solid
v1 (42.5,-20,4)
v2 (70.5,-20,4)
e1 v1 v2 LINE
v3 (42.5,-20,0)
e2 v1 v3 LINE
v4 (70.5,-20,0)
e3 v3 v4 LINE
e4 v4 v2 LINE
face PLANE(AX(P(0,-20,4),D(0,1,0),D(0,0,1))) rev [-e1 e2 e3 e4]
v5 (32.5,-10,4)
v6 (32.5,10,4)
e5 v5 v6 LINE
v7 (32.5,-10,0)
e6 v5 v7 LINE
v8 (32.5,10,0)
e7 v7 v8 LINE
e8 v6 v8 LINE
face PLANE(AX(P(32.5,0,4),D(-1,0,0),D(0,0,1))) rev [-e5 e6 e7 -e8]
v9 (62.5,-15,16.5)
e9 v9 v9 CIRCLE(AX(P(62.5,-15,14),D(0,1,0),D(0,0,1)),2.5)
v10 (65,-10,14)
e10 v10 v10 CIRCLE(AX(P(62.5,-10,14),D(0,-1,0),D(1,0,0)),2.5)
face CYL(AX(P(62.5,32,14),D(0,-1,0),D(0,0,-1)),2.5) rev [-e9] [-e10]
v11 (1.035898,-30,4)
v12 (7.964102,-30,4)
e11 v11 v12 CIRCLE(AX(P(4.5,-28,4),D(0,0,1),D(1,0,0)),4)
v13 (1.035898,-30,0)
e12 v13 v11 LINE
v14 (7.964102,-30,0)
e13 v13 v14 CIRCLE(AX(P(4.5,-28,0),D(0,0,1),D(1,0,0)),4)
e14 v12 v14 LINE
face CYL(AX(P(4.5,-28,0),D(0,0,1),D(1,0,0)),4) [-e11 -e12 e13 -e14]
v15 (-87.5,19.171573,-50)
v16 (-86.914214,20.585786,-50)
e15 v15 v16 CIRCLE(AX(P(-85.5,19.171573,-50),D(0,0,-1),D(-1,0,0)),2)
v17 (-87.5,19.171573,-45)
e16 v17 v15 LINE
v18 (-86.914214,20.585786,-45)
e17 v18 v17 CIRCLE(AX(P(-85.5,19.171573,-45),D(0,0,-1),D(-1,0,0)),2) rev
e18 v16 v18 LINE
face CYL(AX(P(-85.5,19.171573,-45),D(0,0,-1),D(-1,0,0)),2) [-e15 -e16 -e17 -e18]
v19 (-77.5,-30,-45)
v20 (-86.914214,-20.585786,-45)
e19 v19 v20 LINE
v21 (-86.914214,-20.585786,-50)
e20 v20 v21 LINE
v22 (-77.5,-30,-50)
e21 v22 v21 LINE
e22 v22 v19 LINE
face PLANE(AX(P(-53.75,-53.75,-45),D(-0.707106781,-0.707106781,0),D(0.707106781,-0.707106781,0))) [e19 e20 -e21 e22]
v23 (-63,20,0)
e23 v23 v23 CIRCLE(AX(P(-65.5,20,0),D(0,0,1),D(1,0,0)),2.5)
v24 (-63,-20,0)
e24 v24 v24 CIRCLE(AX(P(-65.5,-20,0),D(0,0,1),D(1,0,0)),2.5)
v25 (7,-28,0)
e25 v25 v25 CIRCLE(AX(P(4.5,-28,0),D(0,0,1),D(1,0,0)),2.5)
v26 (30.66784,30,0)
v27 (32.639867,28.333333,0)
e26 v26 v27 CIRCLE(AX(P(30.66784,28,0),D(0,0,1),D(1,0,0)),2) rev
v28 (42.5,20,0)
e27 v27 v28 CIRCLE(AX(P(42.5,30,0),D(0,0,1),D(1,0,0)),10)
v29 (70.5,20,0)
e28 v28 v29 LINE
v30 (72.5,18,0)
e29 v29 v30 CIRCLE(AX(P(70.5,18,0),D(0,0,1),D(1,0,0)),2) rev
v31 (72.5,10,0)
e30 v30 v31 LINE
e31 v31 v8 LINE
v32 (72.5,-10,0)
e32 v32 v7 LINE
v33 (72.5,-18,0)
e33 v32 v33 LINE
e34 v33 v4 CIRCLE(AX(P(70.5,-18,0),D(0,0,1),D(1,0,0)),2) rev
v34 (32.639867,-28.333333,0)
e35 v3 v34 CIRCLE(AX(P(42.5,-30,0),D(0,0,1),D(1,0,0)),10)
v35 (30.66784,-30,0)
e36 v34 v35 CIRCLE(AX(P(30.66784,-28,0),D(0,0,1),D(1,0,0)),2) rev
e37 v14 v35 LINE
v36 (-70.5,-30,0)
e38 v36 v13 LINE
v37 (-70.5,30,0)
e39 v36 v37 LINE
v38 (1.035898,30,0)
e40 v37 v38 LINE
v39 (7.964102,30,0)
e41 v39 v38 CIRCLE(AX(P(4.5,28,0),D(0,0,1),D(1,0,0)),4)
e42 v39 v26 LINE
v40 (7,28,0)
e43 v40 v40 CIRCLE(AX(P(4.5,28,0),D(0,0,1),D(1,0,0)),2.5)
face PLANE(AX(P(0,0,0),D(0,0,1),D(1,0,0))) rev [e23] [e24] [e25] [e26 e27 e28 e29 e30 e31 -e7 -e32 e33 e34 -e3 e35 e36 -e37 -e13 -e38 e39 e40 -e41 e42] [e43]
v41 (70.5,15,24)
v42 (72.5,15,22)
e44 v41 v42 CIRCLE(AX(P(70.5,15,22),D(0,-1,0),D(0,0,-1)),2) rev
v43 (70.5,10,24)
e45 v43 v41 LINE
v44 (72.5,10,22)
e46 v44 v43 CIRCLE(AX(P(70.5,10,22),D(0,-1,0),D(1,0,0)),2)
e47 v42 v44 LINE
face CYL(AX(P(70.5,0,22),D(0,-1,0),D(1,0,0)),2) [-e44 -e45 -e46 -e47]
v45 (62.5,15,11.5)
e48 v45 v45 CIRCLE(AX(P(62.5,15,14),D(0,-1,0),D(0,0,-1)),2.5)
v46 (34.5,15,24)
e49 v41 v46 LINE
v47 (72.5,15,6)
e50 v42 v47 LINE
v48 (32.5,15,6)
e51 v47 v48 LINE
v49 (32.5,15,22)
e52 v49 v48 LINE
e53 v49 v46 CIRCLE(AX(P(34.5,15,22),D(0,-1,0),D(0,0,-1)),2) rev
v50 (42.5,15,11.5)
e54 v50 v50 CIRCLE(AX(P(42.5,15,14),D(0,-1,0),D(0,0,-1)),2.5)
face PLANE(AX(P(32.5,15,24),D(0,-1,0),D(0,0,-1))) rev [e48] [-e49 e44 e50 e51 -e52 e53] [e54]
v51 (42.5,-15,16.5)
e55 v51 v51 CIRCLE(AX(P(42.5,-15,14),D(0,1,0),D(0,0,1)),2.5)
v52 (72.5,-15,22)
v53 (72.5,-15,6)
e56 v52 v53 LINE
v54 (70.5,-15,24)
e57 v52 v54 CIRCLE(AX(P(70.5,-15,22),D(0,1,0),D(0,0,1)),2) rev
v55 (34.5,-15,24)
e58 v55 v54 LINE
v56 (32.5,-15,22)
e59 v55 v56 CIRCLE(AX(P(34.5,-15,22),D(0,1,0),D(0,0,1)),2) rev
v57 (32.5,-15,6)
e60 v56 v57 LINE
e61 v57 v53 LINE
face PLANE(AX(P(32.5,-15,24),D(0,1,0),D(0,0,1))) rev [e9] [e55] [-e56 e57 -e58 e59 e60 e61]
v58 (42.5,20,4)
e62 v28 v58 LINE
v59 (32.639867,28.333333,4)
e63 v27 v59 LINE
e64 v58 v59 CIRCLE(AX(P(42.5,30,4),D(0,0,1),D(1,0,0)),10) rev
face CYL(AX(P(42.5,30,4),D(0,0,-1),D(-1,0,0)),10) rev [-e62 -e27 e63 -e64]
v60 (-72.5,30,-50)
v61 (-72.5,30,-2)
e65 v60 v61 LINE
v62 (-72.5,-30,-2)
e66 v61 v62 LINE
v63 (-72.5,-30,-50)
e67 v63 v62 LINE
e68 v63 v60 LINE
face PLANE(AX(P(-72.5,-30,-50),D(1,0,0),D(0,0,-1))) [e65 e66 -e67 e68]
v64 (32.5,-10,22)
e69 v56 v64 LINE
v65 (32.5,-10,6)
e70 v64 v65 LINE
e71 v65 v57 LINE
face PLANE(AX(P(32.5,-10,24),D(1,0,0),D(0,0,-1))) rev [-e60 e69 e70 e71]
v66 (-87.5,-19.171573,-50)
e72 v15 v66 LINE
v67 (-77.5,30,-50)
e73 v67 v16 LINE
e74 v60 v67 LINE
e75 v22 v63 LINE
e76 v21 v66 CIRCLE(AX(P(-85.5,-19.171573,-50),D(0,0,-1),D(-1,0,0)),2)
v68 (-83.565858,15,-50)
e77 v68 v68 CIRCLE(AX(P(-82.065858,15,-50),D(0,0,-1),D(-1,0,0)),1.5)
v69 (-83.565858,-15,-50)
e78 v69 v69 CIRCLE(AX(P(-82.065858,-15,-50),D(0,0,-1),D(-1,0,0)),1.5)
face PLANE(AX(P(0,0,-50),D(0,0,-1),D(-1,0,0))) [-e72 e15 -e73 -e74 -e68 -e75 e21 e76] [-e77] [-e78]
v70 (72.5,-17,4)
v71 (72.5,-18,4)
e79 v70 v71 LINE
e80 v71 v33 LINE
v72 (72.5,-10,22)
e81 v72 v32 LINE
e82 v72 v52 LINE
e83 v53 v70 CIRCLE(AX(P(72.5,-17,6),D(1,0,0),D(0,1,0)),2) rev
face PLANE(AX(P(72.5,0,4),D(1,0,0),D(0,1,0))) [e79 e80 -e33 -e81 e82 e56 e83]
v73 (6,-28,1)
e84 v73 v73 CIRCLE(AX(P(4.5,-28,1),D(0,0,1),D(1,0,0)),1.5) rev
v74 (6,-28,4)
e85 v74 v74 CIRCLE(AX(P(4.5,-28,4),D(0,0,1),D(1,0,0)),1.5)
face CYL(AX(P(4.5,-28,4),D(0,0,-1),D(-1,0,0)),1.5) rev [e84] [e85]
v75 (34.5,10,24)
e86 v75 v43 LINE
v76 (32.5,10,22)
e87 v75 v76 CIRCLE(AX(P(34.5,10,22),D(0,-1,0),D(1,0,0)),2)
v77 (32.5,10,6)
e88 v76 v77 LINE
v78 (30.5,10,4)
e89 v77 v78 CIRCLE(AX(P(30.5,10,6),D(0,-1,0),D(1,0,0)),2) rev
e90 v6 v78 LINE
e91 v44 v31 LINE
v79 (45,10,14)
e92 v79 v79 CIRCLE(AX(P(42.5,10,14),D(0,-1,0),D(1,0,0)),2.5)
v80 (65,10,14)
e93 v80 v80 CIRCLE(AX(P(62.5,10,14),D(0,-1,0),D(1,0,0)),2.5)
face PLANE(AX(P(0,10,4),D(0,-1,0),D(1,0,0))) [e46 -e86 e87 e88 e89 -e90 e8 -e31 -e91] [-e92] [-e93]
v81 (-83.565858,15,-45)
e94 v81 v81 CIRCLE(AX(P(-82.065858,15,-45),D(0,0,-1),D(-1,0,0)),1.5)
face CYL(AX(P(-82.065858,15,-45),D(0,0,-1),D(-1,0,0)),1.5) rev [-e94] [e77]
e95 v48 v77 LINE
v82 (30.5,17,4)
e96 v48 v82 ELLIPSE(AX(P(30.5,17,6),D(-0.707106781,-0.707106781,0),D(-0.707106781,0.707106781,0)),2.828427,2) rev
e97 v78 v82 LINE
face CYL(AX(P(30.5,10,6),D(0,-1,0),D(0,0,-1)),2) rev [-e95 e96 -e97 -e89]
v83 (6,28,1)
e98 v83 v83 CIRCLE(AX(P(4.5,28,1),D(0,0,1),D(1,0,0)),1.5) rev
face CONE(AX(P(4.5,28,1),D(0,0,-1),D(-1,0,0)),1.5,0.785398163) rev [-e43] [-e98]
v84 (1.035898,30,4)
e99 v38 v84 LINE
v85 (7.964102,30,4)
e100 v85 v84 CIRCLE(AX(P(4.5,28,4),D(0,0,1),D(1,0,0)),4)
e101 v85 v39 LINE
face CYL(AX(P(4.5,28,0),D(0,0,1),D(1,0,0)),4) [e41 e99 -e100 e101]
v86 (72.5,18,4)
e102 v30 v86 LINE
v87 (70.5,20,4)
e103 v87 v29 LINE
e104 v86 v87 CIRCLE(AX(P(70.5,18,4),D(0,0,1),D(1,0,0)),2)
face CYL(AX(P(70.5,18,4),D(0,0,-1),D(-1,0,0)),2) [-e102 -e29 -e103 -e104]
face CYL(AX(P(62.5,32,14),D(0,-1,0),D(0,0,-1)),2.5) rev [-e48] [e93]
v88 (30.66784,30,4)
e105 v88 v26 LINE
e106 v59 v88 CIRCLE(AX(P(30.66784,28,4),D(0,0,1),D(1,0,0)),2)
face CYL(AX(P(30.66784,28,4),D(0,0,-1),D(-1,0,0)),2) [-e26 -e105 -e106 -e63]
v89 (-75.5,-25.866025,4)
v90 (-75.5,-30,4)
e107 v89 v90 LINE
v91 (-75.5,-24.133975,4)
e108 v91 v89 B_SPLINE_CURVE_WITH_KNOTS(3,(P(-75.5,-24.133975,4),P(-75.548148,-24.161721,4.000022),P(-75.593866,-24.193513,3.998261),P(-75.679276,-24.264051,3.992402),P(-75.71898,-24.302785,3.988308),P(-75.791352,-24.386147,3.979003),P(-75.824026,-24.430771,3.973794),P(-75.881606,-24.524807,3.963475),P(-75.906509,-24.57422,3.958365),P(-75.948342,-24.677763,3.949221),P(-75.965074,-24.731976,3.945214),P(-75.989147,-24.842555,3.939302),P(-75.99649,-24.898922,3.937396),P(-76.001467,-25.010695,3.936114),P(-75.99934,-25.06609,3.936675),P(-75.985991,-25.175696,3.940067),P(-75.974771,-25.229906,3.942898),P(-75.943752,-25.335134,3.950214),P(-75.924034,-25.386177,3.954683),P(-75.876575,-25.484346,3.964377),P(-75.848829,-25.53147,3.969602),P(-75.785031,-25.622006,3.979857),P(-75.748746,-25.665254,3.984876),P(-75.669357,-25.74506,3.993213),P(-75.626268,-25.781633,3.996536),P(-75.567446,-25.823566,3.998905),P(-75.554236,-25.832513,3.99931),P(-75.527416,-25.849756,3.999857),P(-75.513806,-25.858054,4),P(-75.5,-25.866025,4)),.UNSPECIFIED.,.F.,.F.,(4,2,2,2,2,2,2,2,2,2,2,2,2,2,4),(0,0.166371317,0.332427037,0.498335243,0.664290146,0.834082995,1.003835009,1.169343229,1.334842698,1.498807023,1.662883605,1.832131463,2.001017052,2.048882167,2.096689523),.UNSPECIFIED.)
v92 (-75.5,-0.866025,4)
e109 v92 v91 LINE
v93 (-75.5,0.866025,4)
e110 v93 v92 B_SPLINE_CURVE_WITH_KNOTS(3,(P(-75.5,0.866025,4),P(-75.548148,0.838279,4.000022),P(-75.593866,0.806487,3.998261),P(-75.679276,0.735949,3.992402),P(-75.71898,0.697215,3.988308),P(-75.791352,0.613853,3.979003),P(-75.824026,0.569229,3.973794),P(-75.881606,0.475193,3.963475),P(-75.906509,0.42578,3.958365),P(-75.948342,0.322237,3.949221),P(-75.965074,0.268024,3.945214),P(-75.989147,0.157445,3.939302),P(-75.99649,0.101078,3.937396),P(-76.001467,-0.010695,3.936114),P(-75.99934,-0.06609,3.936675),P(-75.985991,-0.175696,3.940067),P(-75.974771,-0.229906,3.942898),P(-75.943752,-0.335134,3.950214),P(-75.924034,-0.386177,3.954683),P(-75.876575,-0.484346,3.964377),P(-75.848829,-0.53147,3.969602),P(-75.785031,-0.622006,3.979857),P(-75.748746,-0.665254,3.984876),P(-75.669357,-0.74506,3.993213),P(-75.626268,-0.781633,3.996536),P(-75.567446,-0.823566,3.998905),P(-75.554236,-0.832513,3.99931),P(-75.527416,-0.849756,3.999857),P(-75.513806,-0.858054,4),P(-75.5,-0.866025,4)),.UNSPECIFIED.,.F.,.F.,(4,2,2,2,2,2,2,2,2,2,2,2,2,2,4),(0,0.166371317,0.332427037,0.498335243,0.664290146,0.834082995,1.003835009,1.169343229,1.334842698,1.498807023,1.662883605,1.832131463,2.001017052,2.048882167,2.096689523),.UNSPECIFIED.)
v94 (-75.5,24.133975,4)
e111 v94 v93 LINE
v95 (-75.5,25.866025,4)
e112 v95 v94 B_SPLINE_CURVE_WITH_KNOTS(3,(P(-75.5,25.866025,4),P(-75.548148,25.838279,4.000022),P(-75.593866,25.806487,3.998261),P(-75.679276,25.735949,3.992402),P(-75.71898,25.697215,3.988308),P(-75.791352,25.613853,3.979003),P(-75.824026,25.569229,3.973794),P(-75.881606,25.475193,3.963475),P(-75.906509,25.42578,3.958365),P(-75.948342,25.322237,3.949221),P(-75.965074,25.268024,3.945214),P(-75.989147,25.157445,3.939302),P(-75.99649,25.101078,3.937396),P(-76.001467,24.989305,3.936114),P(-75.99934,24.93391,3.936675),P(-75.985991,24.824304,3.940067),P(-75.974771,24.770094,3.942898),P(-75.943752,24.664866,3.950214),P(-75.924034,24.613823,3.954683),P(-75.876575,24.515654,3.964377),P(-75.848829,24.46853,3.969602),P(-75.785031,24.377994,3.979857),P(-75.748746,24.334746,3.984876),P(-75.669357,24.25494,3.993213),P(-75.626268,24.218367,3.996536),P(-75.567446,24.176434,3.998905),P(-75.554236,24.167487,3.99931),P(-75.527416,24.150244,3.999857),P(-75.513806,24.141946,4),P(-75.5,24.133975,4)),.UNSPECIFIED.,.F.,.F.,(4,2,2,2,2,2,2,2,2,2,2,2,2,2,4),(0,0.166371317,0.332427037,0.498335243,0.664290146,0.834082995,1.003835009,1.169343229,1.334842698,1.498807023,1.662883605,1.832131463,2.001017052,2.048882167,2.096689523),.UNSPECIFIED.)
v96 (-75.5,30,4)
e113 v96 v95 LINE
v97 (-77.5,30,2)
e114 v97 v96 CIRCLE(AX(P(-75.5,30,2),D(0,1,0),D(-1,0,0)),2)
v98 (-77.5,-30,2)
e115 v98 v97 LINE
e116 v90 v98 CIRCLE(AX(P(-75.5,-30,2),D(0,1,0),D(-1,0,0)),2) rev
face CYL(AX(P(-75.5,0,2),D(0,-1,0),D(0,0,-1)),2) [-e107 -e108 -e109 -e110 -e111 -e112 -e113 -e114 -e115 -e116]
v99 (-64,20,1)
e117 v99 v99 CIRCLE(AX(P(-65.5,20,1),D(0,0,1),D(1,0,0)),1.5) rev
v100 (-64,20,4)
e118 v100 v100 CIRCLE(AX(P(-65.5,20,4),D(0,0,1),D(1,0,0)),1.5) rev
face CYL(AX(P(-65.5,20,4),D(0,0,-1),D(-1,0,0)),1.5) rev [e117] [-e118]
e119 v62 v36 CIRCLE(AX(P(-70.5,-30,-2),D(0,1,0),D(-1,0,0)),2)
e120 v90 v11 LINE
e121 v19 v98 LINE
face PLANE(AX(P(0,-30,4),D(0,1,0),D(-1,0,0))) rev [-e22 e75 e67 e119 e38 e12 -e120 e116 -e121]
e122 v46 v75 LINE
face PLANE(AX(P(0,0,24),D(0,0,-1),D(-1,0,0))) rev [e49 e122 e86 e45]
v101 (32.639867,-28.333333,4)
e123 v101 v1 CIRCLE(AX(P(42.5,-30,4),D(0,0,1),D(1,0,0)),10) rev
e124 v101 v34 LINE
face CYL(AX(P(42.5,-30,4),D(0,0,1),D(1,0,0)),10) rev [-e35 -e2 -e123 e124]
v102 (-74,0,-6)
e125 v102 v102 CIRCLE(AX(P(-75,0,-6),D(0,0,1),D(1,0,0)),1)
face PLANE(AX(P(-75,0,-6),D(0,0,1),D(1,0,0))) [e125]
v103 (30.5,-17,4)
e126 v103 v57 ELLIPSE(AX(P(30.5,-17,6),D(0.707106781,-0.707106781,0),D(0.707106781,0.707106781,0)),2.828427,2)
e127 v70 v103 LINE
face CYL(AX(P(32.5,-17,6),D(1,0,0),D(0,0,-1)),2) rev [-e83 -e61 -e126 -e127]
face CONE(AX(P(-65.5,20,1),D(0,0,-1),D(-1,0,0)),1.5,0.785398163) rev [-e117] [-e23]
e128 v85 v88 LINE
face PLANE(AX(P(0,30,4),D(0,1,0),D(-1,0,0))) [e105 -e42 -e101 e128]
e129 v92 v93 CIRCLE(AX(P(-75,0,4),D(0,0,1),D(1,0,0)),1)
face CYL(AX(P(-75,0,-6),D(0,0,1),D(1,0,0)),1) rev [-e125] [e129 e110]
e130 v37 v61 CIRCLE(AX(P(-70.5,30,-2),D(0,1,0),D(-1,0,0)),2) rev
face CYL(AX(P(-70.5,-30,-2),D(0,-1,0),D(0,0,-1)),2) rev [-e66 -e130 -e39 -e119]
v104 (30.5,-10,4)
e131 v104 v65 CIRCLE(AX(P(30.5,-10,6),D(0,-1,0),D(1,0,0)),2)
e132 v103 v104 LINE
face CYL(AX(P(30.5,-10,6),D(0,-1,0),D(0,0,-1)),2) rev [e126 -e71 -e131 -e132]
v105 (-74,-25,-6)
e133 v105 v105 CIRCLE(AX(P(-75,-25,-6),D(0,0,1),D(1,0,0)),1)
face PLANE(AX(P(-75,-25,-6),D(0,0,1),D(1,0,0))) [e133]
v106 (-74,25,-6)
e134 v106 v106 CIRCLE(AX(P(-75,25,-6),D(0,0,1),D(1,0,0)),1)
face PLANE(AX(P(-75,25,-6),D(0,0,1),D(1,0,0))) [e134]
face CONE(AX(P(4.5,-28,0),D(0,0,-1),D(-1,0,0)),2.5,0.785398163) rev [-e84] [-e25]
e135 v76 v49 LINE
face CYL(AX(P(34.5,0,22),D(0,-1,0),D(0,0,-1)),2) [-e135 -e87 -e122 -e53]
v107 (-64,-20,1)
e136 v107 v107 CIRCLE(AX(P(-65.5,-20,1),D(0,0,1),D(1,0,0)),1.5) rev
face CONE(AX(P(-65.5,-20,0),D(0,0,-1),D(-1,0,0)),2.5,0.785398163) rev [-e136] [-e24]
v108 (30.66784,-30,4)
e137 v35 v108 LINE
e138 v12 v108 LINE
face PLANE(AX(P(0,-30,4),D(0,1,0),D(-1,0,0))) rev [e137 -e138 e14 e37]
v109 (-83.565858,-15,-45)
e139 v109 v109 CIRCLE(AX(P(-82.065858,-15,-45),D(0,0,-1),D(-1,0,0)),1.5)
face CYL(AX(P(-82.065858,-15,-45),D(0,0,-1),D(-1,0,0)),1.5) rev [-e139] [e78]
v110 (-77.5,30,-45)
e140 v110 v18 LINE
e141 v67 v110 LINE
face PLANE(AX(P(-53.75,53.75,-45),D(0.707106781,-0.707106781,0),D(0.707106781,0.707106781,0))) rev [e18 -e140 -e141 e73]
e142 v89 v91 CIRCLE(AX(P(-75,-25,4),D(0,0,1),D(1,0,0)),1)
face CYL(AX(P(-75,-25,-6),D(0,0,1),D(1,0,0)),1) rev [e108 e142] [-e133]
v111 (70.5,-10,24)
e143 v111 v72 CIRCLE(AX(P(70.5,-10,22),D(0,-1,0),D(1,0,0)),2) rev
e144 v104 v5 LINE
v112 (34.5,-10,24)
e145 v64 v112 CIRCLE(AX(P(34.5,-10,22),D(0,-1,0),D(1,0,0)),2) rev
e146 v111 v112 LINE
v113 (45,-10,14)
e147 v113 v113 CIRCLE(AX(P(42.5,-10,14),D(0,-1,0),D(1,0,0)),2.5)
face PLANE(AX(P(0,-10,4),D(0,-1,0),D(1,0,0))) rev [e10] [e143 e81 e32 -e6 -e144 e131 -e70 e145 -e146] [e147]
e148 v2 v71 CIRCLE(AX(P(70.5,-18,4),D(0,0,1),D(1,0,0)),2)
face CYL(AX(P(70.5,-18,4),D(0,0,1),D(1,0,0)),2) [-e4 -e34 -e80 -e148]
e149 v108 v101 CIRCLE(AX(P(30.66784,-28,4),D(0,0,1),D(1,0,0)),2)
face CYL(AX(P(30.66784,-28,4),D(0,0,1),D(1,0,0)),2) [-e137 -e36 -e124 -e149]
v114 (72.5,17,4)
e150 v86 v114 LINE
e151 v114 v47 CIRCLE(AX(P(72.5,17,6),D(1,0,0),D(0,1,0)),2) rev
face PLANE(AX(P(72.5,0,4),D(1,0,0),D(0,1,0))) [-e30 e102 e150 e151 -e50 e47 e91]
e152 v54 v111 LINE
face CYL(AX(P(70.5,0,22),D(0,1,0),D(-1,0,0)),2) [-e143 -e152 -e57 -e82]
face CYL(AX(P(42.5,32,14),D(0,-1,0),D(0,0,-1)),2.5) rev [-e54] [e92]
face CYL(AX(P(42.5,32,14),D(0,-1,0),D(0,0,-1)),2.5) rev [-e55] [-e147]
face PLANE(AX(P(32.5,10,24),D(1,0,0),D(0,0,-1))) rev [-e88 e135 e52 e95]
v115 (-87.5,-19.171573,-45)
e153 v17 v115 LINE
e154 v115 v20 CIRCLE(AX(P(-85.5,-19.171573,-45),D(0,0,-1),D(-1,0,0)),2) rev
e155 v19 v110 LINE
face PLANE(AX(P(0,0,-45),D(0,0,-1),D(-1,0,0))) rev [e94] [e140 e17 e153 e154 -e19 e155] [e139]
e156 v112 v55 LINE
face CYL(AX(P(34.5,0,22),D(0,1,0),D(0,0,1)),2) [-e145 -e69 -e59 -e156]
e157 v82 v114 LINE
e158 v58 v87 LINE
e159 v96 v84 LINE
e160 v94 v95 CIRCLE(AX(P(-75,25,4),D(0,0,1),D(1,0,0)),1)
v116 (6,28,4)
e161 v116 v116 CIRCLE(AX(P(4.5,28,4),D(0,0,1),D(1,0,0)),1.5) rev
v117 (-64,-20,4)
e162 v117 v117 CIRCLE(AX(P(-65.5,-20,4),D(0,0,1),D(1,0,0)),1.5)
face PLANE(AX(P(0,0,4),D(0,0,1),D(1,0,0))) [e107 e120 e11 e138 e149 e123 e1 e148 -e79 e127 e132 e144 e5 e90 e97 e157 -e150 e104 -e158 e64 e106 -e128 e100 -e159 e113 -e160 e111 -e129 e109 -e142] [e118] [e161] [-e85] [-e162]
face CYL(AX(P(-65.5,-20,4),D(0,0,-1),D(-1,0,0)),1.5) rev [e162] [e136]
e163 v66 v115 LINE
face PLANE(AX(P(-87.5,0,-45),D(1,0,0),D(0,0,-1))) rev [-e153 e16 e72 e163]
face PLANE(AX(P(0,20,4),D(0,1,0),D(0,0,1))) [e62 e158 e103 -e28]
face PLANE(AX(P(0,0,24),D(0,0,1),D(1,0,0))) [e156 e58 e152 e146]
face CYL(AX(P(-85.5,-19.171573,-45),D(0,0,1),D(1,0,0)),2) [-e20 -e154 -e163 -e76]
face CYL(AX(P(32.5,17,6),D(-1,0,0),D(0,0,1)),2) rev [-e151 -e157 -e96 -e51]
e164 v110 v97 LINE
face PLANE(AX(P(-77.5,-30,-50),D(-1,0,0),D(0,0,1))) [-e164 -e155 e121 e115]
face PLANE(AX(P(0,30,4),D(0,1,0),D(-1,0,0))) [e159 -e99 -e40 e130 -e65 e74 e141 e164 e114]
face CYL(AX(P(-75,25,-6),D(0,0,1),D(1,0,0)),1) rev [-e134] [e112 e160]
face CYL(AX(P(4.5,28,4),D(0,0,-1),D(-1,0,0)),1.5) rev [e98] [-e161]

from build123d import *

# Parameters (mm, degrees)
SCHIZZO1_R                    = 1.5
SCHIZZO1_W                    = 40
SCHIZZO1_H                    = 10
ESTRUSIONE_ESTRUSIONE1_DEPTH  = 4
RACCORDO1_R                   = 10
SCHIZZO2_R                    = 4
SCHIZZO2_R_2                  = 2
ESTRUSIONE_ESTRUSIONE2_DEPTH  = 4
SCHIZZO3_W                    = 40
SCHIZZO3_H                    = 5
ESTRUSIONE_ESTRUSIONE3_DEPTH  = 20
TAGLIO_ESTRUSIONE1_DEPTH      = 90.673017123
TAGLIO_ESTRUSIONE1_DEPTH_BACK = 90.673017123
SCHIZZO4_R                    = 2.5
SCHIZZO5_W                    = 5
SCHIZZO5_H                    = 60
ESTRUSIONE_ESTRUSIONE4_DEPTH  = 54
SCHIZZO6_R                    = 1.5
ESTRUSIONE_ESTRUSIONE5_DEPTH  = 5
RACCORDO2_R                   = 2
SMUSSO1_SIZE                  = 1
SCHIZZO7_R                    = 1
TAGLIO_ESTRUSIONE2_DEPTH      = 10


with BuildPart() as part:
    # Schizzo1 → Estrusione-Estrusione1 (new body)
    # profile 1 of 5: a face of its own
    with BuildSketch(Plane.XY):
        with BuildLine():
            Line((32.5, -20), (32.5, -10))
            Line((32.5, -10), (32.5, 10))
            Line((32.5, 10), (32.5, 20))
            Line((32.5, 20), (-64, 20))
            ThreePointArc((-64, 20), (-65.5, 18.5), (-67, 20))
            Line((-67, 20), (-72.5, 20))
            Line((-72.5, 20), (-72.5, -20))
            Line((-72.5, -20), (-67, -20))
            ThreePointArc((-67, -20), (-65.5, -18.5), (-64, -20))
            Line((-64, -20), (32.5, -20))
        make_face()
    # profile 2 of 5: a face of its own
    with BuildSketch(Plane.XY):
        with BuildLine():
            Line((-64, 20), (32.5, 20))
            Line((32.5, 20), (32.5, 30))
            Line((32.5, 30), (-72.5, 30))
            Line((-72.5, 30), (-72.5, 20))
            Line((-72.5, 20), (-67, 20))
            ThreePointArc((-67, 20), (-65.5, 21.5), (-64, 20))
        make_face()
        with Locations((4.5, 28)):
            Circle(SCHIZZO1_R, mode=Mode.SUBTRACT)
    # profile 3 of 5: a face of its own
    with BuildSketch(Plane.XY):
        with BuildLine():
            Line((32.5, -30), (32.5, -20))
            Line((32.5, -20), (-64, -20))
            ThreePointArc((-64, -20), (-65.5, -21.5), (-67, -20))
            Line((-67, -20), (-72.5, -20))
            Line((-72.5, -20), (-72.5, -30))
            Line((-72.5, -30), (32.5, -30))
        make_face()
        with Locations((4.5, -28)):
            Circle(SCHIZZO1_R, mode=Mode.SUBTRACT)
    # profile 4 of 5: a face of its own
    with BuildSketch(Plane.XY):
        with Locations((52.5, 15)):
            Rectangle(SCHIZZO1_W, SCHIZZO1_H)
    # profile 5 of 5: a face of its own
    with BuildSketch(Plane.XY):
        with Locations((52.5, -15)):
            Rectangle(SCHIZZO1_W, SCHIZZO1_H)
    extrude(amount=ESTRUSIONE_ESTRUSIONE1_DEPTH)

    # Raccordo1
    raccordo1_edges = [part.edges().sort_by_distance(p)[0] for p in [
        (32.5, 20, 2),
        (32.5, -20, 2),
    ]]
    fillet(raccordo1_edges, radius=RACCORDO1_R - 0.0001)  # a hair under: the kernel refuses the full size

    # Schizzo2 → Estrusione-Estrusione2 (add)
    # profile 1 of 2: a face of its own
    with BuildSketch(Plane.XY.offset(4)):
        with Locations((4.5, -28)):
            Circle(SCHIZZO2_R)
        with Locations((4.5, -28)):
            Circle(SCHIZZO2_R_2, mode=Mode.SUBTRACT)
    # profile 2 of 2: a face of its own
    with BuildSketch(Plane.XY.offset(4)):
        with Locations((4.5, 28)):
            Circle(SCHIZZO2_R)
        with Locations((4.5, 28)):
            Circle(SCHIZZO2_R_2, mode=Mode.SUBTRACT)
    extrude(amount=-ESTRUSIONE_ESTRUSIONE2_DEPTH)

    # Schizzo3 → Estrusione-Estrusione3 (add)
    with BuildSketch(Plane.XY.offset(4)):
        with Locations((52.5, -12.5)):
            Rectangle(SCHIZZO3_W, SCHIZZO3_H)
        with Locations((52.5, 12.5)):
            Rectangle(SCHIZZO3_W, SCHIZZO3_H)
    extrude(amount=ESTRUSIONE_ESTRUSIONE3_DEPTH)

    # Schizzo4 → Taglio-Estrusione1 (cut, two sides: drawn at the far end of the back side and taken through both)
    with BuildSketch(Plane.XZ.offset(15).offset(-TAGLIO_ESTRUSIONE1_DEPTH_BACK)):
        with Locations(Location((42.5, 14, 0), (0, 0, 270))):
            Circle(SCHIZZO4_R)
        with Locations(Location((62.5, 14, 0), (0, 0, 270))):
            Circle(SCHIZZO4_R)
    extrude(amount=TAGLIO_ESTRUSIONE1_DEPTH + TAGLIO_ESTRUSIONE1_DEPTH_BACK, mode=Mode.SUBTRACT)

    # Schizzo5 → Estrusione-Estrusione4 (add)
    with BuildSketch(Plane.XY.offset(4)):
        with Locations((-75, 0)):
            Rectangle(SCHIZZO5_W, SCHIZZO5_H)
    extrude(amount=-ESTRUSIONE_ESTRUSIONE4_DEPTH)

    # Schizzo6 → Estrusione-Estrusione5 (add)
    with BuildSketch(Plane(origin=(0, 0, -50), x_dir=(-1, 0, 0), z_dir=(0, 0, -1))):
        Polygon((87.5, 20), (77.5, 30), (77.5, -30), (87.5, -20), align=None)
        with Locations((82.065858054, -15)):
            Circle(SCHIZZO6_R, mode=Mode.SUBTRACT)
        with Locations((82.065858054, 15)):
            Circle(SCHIZZO6_R, mode=Mode.SUBTRACT)
    extrude(amount=-ESTRUSIONE_ESTRUSIONE5_DEPTH)

    # Raccordo2
    raccordo2_edges = [part.edges().sort_by_distance(p)[0] for p in [
        (32.5, -12.5, 4),
        (52.5, -15, 4),
        (72.5, -12.5, 24),
        (32.5, -12.5, 24),
        (52.5, 15, 4),
        (32.5, 12.5, 4),
        (32.5, 12.5, 24),
        (72.5, 12.5, 24),
        (-77.5, 0, 4),
        (-87.5, 20, -47.5),
        (-87.5, -20, -47.5),
        (-72.5, 0, 0),
        (72.5, 20, 2),
        (72.5, -20, 2),
        (32.5, -30, 2),
        (32.5, 30, 2),
    ]]
    fillet(raccordo2_edges, radius=RACCORDO2_R)

    # Smusso1
    smusso1_edges = [part.edges().sort_by_distance(p)[0] for p in [
        (3, 28, 0),
        (3, -28, 0),
        (-67, 20, 0),
        (-64, -20, 0),
    ]]
    chamfer(smusso1_edges, length=SMUSSO1_SIZE)

    # Schizzo7 → Taglio-Estrusione2 (cut)
    with BuildSketch(Plane.XY.offset(4)):
        with Locations((-75, 0)):
            Circle(SCHIZZO7_R)
        with Locations((-75, 25)):
            Circle(SCHIZZO7_R)
        with Locations((-75, -25)):
            Circle(SCHIZZO7_R)
    extrude(amount=-TAGLIO_ESTRUSIONE2_DEPTH, mode=Mode.SUBTRACT)


solid = part.part
